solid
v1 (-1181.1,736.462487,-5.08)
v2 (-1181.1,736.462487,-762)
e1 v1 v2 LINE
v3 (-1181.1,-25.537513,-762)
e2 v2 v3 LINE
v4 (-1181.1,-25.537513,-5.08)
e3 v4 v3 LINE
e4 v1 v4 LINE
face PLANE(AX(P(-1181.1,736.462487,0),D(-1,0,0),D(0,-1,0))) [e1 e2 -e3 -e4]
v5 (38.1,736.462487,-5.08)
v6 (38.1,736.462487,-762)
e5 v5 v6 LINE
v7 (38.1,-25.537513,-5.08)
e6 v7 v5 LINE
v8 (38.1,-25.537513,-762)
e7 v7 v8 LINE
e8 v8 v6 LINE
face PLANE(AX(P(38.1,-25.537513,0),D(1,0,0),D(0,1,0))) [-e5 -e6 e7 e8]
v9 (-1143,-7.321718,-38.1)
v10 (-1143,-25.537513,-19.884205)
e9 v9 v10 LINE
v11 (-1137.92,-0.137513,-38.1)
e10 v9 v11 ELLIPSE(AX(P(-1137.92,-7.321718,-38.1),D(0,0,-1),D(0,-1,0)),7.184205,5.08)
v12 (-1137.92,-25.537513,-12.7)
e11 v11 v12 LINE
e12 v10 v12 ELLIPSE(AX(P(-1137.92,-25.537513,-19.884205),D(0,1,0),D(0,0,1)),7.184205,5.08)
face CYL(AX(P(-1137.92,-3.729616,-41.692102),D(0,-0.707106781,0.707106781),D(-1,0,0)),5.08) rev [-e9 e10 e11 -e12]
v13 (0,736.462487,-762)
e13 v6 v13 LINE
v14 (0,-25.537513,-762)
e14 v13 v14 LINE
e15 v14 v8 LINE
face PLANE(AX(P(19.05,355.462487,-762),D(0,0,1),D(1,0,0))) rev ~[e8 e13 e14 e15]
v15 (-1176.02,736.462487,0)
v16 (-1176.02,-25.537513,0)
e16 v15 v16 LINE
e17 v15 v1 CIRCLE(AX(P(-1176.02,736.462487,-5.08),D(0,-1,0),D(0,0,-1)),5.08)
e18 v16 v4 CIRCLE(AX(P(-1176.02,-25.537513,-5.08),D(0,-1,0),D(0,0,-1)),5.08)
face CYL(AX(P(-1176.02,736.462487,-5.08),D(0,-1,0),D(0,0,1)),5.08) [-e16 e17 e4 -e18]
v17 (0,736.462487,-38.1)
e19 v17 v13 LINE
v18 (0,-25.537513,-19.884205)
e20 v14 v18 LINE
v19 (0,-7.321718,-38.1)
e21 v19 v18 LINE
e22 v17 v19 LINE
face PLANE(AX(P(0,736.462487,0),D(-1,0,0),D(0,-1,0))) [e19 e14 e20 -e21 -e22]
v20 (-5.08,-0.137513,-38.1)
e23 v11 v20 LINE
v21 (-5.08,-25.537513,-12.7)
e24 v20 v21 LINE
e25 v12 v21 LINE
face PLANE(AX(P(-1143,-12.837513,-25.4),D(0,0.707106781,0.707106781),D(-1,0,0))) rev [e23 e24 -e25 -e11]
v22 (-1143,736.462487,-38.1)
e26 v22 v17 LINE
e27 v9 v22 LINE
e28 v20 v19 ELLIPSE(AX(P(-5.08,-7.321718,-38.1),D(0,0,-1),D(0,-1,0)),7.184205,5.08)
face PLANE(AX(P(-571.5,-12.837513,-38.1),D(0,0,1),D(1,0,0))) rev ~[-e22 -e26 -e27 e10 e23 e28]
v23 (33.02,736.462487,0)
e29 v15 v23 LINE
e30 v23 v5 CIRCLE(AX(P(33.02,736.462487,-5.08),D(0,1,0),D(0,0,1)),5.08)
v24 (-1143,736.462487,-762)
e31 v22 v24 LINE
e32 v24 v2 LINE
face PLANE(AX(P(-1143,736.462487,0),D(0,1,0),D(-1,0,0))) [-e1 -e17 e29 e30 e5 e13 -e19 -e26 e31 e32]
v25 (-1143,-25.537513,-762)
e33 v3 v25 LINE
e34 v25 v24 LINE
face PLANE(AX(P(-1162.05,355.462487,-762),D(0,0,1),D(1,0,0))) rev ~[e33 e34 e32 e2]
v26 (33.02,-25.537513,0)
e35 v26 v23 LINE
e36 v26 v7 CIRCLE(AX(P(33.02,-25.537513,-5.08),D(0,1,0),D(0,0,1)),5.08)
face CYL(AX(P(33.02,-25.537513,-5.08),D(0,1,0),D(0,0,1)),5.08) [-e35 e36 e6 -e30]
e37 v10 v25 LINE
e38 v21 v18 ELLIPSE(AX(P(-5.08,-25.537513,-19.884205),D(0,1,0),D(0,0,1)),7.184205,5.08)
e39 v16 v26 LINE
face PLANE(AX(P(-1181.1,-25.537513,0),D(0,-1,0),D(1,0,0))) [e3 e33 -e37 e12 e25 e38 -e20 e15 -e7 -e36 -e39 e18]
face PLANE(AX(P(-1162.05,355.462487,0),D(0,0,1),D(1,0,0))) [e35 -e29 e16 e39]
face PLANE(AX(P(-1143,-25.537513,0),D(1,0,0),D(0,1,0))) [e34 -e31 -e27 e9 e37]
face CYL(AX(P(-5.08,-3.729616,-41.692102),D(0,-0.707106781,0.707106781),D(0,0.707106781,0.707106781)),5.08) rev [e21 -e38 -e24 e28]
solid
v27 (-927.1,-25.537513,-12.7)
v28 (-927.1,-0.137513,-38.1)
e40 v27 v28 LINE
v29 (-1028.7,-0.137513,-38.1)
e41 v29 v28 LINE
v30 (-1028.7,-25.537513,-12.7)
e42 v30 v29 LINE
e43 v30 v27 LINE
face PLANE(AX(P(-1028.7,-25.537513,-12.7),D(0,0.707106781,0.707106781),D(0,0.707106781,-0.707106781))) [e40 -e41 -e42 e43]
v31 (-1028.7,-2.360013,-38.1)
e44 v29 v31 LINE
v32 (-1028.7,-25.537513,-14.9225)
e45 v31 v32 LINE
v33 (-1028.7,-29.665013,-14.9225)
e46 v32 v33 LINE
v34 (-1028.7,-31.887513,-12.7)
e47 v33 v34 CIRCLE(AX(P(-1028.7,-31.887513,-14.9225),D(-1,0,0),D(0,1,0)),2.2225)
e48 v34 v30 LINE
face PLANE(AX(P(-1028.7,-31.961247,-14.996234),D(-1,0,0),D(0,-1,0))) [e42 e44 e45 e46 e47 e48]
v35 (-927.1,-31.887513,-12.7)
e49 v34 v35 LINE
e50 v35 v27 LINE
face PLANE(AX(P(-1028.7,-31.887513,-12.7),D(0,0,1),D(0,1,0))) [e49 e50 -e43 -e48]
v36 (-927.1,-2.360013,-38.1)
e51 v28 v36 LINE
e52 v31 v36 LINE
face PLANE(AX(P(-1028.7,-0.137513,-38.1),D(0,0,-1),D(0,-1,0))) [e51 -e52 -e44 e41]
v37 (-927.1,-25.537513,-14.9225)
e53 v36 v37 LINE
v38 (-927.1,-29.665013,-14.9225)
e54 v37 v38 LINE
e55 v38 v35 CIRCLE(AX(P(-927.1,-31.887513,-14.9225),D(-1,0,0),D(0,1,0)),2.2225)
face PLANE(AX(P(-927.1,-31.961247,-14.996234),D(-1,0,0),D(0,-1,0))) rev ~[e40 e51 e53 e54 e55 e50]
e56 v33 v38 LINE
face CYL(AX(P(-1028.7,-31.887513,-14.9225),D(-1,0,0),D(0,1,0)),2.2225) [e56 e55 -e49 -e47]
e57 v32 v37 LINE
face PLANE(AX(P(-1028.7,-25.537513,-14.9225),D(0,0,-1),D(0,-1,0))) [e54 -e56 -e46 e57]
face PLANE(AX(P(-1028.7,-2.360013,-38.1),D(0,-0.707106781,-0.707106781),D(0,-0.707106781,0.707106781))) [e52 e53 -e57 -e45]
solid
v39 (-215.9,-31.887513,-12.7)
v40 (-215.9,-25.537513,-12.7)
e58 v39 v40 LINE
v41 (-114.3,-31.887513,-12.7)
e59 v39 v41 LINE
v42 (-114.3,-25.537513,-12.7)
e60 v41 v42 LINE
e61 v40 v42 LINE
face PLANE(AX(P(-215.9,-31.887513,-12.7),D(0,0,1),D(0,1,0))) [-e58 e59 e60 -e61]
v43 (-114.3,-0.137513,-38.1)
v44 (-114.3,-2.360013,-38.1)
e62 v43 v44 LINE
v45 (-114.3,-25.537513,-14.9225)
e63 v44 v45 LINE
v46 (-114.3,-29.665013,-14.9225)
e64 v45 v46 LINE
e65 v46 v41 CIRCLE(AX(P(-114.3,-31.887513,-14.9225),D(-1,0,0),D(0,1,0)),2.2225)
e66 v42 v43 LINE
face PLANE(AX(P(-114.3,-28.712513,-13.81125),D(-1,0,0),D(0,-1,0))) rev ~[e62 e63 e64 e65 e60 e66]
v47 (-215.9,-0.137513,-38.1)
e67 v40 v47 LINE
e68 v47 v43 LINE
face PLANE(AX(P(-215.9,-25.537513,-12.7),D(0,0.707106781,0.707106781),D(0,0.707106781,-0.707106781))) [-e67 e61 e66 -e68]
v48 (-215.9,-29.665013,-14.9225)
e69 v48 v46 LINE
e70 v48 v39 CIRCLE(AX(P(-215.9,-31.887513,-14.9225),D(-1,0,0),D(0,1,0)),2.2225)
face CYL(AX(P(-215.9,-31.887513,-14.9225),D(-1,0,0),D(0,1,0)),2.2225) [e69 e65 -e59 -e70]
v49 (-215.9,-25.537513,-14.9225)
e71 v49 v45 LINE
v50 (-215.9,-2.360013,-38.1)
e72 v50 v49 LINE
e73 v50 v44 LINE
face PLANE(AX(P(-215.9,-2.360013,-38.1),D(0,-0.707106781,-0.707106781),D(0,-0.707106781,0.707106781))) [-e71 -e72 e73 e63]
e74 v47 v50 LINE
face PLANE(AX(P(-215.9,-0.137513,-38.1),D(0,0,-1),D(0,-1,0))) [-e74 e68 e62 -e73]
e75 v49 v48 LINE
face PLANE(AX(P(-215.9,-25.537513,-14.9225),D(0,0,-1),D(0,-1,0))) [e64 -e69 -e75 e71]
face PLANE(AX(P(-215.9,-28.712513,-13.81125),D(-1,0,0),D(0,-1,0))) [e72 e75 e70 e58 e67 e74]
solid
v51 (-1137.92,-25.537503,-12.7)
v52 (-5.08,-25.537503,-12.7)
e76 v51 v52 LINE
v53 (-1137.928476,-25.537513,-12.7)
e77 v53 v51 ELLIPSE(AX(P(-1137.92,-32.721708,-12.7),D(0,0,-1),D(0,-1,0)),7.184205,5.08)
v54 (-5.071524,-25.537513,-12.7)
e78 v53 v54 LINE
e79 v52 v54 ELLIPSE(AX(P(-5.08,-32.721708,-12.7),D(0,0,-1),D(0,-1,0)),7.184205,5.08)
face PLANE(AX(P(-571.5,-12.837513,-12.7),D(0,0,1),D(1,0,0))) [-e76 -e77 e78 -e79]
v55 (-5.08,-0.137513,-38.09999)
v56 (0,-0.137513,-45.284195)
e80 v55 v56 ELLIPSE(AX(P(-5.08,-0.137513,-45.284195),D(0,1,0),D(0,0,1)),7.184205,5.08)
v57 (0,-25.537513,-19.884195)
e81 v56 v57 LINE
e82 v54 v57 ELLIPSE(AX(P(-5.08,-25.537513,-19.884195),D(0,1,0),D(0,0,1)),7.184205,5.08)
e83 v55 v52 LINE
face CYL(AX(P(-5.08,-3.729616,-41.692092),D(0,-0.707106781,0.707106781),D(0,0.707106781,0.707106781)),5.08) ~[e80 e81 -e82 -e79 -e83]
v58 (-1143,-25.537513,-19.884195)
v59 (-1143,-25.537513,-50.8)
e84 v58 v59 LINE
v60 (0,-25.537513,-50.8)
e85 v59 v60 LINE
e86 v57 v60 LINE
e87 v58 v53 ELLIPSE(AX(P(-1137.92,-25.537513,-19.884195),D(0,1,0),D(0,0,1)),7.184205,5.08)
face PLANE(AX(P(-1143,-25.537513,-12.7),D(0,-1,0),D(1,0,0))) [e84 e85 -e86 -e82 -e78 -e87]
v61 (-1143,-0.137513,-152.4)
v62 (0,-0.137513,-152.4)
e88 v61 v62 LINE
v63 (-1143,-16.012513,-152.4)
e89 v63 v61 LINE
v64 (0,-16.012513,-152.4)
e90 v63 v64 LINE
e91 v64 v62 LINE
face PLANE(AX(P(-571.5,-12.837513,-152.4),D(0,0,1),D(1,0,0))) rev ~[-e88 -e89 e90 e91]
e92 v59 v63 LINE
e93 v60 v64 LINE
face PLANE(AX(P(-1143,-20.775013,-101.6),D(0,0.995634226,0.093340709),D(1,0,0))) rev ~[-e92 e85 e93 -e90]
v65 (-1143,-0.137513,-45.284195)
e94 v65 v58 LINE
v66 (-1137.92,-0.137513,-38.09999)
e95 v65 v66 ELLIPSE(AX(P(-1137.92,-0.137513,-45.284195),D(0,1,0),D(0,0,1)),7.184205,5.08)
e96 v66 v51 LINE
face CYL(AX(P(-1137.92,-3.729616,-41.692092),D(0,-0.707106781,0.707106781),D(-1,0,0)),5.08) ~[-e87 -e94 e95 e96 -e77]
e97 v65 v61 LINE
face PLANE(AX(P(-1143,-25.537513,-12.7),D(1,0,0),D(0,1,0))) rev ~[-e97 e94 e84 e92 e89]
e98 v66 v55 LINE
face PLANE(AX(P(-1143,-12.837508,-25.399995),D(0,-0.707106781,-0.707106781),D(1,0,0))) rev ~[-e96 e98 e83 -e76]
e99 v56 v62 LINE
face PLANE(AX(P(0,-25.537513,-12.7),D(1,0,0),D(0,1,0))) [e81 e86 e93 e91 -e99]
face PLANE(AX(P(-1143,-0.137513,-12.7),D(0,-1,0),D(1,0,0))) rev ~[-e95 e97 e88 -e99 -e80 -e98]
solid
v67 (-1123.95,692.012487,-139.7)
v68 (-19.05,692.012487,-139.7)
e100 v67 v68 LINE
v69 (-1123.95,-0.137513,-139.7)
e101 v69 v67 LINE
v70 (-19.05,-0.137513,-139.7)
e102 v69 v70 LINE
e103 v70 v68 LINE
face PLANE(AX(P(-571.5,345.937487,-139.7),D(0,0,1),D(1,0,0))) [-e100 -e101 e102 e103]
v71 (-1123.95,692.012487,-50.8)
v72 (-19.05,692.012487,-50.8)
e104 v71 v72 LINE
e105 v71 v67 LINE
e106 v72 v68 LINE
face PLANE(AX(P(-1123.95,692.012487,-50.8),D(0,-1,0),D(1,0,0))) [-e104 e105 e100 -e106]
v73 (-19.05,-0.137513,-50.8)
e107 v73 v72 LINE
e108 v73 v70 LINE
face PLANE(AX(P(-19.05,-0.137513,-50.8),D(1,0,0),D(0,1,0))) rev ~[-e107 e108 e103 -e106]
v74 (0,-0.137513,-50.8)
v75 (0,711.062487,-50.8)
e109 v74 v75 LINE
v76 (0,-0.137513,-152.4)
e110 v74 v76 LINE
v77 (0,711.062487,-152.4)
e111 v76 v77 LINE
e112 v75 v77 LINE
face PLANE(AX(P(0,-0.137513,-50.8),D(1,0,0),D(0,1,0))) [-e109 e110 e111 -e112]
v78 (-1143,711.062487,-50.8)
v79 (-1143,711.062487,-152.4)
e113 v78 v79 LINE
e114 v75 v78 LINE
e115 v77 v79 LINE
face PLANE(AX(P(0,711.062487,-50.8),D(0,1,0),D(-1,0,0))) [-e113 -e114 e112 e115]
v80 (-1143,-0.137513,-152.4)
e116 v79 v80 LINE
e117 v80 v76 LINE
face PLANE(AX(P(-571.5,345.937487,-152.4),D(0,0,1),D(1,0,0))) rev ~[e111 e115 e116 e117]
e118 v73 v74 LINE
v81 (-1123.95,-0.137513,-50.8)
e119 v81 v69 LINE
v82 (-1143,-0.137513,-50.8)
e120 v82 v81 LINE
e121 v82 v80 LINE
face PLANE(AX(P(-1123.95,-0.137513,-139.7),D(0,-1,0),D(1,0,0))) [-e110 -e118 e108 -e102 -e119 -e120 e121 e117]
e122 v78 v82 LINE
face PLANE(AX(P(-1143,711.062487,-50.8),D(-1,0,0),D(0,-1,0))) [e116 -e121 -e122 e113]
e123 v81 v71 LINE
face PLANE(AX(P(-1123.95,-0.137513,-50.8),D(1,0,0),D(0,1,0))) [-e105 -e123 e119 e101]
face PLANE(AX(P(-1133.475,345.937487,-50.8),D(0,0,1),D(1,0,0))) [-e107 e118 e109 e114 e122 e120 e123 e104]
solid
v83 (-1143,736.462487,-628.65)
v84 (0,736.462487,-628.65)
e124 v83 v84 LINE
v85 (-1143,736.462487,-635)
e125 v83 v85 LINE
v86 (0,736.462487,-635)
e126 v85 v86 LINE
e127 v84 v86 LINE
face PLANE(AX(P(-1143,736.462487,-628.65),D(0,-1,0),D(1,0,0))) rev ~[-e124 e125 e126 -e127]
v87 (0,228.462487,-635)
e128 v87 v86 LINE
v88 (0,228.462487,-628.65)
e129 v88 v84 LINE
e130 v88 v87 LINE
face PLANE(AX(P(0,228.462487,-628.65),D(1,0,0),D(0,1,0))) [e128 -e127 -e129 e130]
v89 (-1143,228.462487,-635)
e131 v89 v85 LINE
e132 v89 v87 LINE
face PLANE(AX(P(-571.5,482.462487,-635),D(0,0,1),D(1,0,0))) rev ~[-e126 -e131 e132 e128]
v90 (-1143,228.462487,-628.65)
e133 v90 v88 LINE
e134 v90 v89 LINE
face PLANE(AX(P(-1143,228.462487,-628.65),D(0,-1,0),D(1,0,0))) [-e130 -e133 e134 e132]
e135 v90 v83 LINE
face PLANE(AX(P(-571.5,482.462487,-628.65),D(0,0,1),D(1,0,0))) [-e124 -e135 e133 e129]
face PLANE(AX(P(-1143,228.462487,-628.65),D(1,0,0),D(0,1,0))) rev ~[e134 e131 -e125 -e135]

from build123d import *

# Parameters (mm, degrees)
F0_W      = 1143
F0_H      = 25.4
F0_H_2    = 228.6
F0_H_3    = 508
F1_DEPTH  = 38.1
F2_DEPTH  = 762
F3_SIZE   = 25.4
F4_R      = 5.08
F5_START  = -12.7
F5_DEPTH  = 139.7
F6_SIZE   = 25.39999
F7_R      = 5.08
F8_START  = -628.65
F8_DEPTH  = 6.35
F10_START = -152.4
F10_DEPTH = 101.6
F11_START = -965.2
F11_DEPTH = 101.6
F12_R     = 5.08
F13_R     = 5.08
F15_START = -50.8
F14_W     = 19.05
F14_H     = 692.15
F14_W_2   = 1104.9
F14_H_2   = 19.05
F15_DEPTH = 101.6
F16_START = -139.7
F16_DEPTH = 12.7
F17_SIZE2 = 9.525
F17_SIZE  = 101.6


# Not quite as in the source:
# - a fillet or chamfer is up to 0.001 mm smaller than in the source, because OpenCascade refuses the exact size


with BuildPart() as f1:
    # F0 (on Top) → F1 (new body)
    with BuildSketch(Plane.XY):
        with Locations((-571.5, -12.8375131965)):
            Rectangle(F0_W, F0_H)
        with Locations((-571.5, 114.1624868035)):
            Rectangle(F0_W, F0_H_2)
        with Locations((-571.5, 482.4624868035)):
            Rectangle(F0_W, F0_H_3)
    extrude(amount=-F1_DEPTH)

    # F0 (on Top) → F2 (join)
    with BuildSketch(Plane.XY):
        Polygon((-1143, 736.4624868035), (-1181.1, 736.4624868035), (-1181.1, -25.5375131965), (-1143, -25.5375131965), (-1143, -0.1375131965), (-1143, 228.4624868035), align=None)
        Polygon((38.1, 736.4624868035), (0, 736.4624868035), (0, 228.4624868035), (0, -0.1375131965), (0, -25.5375131965), (38.1, -25.5375131965), align=None)
    extrude(amount=-F2_DEPTH)

    # F3
    f3_edges = [f1.edges().sort_by_distance(p)[0] for p in [
        (-571.5, -25.537513, -38.1),
    ]]
    chamfer(f3_edges, length=F3_SIZE)

    # F4
    f4_edges = [f1.edges().sort_by_distance(p)[0] for p in [
        (-1143, -12.837513, -25.4),
        (0, -12.837513, -25.4),
    ]]
    fillet(f4_edges, radius=F4_R)

    # F12
    f12_edges = [f1.edges().sort_by_distance(p)[0] for p in [
        (-1181.1, 355.462487, 0),
    ]]
    fillet(f12_edges, radius=F12_R)

    # F13
    f13_edges = [f1.edges().sort_by_distance(p)[0] for p in [
        (38.1, 355.462487, 0),
    ]]
    fillet(f13_edges, radius=F13_R)


with BuildPart() as f5:
    # F0 (on Top) → F5 (new body)
    with BuildSketch(Plane.XY.offset(F5_START)):
        with Locations((-571.5, -12.8375131965)):
            Rectangle(F0_W, F0_H)
    extrude(amount=-F5_DEPTH)

    # F6 (size 25.4 in the source; OpenCascade refuses exactly that, so slightly less here)
    f6_edges = [f5.edges().sort_by_distance(p)[0] for p in [
        (-571.5, -0.137513, -12.7),
    ]]
    chamfer(f6_edges, length=F6_SIZE)

    # F7
    f7_edges = [f5.edges().sort_by_distance(p)[0] for p in [
        (-1143, -12.837508, -25.399995),
        (0, -12.837508, -25.399995),
    ]]
    fillet(f7_edges, radius=F7_R)

    # F17
    f17_edges = [f5.edges().sort_by_distance(p)[0] for p in [
        (-571.5, -25.537513, -152.4),
    ]]
    f17_side = f5.faces().sort_by_distance((-571.5, -25.537513, -82.556695))[0]
    chamfer(f17_edges, length=F17_SIZE, length2=F17_SIZE2, reference=f17_side)


with BuildPart() as f8:
    # F0 (on Top) → F8 (new body)
    with BuildSketch(Plane.XY.offset(F8_START)):
        with Locations((-571.5, 482.4624868035)):
            Rectangle(F0_W, F0_H_3)
    extrude(amount=-F8_DEPTH)


with BuildPart() as f10:
    # F9 (on face) → F10 (new body)
    with BuildSketch(Plane(origin=(-1181.1, 0, 0), x_dir=(0, -1, 0), z_dir=(-1, 0, 0)).offset(F10_START)):
        with BuildLine():
            ThreePointArc((29.6650131965, -14.9225), (33.4590580177, -16.4940448212), (31.8875131965, -12.7))
            Line((31.8875131965, -12.7), (31.8875131965, -14.9225))
            Line((31.8875131965, -14.9225), (29.6650131965, -14.9225))
        make_face()
        Polygon((31.8875131965, -12.7), (25.5375131965, -12.7), (25.5375131965, -14.9225), (29.6650131965, -14.9225), (31.8875131965, -14.9225), align=None)
        Polygon((25.5375131965, -14.9225), (23.3150131965, -14.9225), (0.1375131965, -38.1), (2.3600131965, -38.1), align=None)
        Polygon((25.5375131965, -14.9225), (25.5375131965, -12.7), (23.3150131965, -14.9225), align=None)
    extrude(amount=-F10_DEPTH)


with BuildPart() as f11:
    # F9 (on face) → F11 (new body)
    with BuildSketch(Plane(origin=(-1181.1, 0, 0), x_dir=(0, -1, 0), z_dir=(-1, 0, 0)).offset(F11_START)):
        Polygon((31.8875131965, -12.7), (25.5375131965, -12.7), (25.5375131965, -14.9225), (29.6650131965, -14.9225), (31.8875131965, -14.9225), align=None)
        with BuildLine():
            ThreePointArc((29.6650131965, -14.9225), (33.4590580177, -16.4940448212), (31.8875131965, -12.7))
            Line((31.8875131965, -12.7), (31.8875131965, -14.9225))
            Line((31.8875131965, -14.9225), (29.6650131965, -14.9225))
        make_face()
        Polygon((25.5375131965, -14.9225), (23.3150131965, -14.9225), (0.1375131965, -38.1), (2.3600131965, -38.1), align=None)
        Polygon((25.5375131965, -14.9225), (25.5375131965, -12.7), (23.3150131965, -14.9225), align=None)
    extrude(amount=-F11_DEPTH)


with BuildPart() as f15:
    # F14 (on face) → F15 (new body)
    with BuildSketch(Plane.XY.offset(F15_START)):
        with Locations((-1133.475, 345.9374868035)):
            Rectangle(F14_W, F14_H)
        with Locations((-9.525, 345.9374868035)):
            Rectangle(F14_W, F14_H)
        with Locations((-571.5, 701.5374868035)):
            Rectangle(F14_W_2, F14_H_2)
        with Locations((-9.525, 701.5374868035)):
            Rectangle(F14_W, F14_H_2)
        with Locations((-1133.475, 701.5374868035)):
            Rectangle(F14_W, F14_H_2)
    extrude(amount=-F15_DEPTH)

    # F14 (on face) → F16 (join)
    with BuildSketch(Plane.XY.offset(F16_START)):
        with Locations((-571.5, 345.9374868035)):
            Rectangle(F14_W_2, F14_H)
    extrude(amount=-F16_DEPTH)


solid = Compound([f1.part, f5.part, f8.part, f10.part, f11.part, f15.part])
